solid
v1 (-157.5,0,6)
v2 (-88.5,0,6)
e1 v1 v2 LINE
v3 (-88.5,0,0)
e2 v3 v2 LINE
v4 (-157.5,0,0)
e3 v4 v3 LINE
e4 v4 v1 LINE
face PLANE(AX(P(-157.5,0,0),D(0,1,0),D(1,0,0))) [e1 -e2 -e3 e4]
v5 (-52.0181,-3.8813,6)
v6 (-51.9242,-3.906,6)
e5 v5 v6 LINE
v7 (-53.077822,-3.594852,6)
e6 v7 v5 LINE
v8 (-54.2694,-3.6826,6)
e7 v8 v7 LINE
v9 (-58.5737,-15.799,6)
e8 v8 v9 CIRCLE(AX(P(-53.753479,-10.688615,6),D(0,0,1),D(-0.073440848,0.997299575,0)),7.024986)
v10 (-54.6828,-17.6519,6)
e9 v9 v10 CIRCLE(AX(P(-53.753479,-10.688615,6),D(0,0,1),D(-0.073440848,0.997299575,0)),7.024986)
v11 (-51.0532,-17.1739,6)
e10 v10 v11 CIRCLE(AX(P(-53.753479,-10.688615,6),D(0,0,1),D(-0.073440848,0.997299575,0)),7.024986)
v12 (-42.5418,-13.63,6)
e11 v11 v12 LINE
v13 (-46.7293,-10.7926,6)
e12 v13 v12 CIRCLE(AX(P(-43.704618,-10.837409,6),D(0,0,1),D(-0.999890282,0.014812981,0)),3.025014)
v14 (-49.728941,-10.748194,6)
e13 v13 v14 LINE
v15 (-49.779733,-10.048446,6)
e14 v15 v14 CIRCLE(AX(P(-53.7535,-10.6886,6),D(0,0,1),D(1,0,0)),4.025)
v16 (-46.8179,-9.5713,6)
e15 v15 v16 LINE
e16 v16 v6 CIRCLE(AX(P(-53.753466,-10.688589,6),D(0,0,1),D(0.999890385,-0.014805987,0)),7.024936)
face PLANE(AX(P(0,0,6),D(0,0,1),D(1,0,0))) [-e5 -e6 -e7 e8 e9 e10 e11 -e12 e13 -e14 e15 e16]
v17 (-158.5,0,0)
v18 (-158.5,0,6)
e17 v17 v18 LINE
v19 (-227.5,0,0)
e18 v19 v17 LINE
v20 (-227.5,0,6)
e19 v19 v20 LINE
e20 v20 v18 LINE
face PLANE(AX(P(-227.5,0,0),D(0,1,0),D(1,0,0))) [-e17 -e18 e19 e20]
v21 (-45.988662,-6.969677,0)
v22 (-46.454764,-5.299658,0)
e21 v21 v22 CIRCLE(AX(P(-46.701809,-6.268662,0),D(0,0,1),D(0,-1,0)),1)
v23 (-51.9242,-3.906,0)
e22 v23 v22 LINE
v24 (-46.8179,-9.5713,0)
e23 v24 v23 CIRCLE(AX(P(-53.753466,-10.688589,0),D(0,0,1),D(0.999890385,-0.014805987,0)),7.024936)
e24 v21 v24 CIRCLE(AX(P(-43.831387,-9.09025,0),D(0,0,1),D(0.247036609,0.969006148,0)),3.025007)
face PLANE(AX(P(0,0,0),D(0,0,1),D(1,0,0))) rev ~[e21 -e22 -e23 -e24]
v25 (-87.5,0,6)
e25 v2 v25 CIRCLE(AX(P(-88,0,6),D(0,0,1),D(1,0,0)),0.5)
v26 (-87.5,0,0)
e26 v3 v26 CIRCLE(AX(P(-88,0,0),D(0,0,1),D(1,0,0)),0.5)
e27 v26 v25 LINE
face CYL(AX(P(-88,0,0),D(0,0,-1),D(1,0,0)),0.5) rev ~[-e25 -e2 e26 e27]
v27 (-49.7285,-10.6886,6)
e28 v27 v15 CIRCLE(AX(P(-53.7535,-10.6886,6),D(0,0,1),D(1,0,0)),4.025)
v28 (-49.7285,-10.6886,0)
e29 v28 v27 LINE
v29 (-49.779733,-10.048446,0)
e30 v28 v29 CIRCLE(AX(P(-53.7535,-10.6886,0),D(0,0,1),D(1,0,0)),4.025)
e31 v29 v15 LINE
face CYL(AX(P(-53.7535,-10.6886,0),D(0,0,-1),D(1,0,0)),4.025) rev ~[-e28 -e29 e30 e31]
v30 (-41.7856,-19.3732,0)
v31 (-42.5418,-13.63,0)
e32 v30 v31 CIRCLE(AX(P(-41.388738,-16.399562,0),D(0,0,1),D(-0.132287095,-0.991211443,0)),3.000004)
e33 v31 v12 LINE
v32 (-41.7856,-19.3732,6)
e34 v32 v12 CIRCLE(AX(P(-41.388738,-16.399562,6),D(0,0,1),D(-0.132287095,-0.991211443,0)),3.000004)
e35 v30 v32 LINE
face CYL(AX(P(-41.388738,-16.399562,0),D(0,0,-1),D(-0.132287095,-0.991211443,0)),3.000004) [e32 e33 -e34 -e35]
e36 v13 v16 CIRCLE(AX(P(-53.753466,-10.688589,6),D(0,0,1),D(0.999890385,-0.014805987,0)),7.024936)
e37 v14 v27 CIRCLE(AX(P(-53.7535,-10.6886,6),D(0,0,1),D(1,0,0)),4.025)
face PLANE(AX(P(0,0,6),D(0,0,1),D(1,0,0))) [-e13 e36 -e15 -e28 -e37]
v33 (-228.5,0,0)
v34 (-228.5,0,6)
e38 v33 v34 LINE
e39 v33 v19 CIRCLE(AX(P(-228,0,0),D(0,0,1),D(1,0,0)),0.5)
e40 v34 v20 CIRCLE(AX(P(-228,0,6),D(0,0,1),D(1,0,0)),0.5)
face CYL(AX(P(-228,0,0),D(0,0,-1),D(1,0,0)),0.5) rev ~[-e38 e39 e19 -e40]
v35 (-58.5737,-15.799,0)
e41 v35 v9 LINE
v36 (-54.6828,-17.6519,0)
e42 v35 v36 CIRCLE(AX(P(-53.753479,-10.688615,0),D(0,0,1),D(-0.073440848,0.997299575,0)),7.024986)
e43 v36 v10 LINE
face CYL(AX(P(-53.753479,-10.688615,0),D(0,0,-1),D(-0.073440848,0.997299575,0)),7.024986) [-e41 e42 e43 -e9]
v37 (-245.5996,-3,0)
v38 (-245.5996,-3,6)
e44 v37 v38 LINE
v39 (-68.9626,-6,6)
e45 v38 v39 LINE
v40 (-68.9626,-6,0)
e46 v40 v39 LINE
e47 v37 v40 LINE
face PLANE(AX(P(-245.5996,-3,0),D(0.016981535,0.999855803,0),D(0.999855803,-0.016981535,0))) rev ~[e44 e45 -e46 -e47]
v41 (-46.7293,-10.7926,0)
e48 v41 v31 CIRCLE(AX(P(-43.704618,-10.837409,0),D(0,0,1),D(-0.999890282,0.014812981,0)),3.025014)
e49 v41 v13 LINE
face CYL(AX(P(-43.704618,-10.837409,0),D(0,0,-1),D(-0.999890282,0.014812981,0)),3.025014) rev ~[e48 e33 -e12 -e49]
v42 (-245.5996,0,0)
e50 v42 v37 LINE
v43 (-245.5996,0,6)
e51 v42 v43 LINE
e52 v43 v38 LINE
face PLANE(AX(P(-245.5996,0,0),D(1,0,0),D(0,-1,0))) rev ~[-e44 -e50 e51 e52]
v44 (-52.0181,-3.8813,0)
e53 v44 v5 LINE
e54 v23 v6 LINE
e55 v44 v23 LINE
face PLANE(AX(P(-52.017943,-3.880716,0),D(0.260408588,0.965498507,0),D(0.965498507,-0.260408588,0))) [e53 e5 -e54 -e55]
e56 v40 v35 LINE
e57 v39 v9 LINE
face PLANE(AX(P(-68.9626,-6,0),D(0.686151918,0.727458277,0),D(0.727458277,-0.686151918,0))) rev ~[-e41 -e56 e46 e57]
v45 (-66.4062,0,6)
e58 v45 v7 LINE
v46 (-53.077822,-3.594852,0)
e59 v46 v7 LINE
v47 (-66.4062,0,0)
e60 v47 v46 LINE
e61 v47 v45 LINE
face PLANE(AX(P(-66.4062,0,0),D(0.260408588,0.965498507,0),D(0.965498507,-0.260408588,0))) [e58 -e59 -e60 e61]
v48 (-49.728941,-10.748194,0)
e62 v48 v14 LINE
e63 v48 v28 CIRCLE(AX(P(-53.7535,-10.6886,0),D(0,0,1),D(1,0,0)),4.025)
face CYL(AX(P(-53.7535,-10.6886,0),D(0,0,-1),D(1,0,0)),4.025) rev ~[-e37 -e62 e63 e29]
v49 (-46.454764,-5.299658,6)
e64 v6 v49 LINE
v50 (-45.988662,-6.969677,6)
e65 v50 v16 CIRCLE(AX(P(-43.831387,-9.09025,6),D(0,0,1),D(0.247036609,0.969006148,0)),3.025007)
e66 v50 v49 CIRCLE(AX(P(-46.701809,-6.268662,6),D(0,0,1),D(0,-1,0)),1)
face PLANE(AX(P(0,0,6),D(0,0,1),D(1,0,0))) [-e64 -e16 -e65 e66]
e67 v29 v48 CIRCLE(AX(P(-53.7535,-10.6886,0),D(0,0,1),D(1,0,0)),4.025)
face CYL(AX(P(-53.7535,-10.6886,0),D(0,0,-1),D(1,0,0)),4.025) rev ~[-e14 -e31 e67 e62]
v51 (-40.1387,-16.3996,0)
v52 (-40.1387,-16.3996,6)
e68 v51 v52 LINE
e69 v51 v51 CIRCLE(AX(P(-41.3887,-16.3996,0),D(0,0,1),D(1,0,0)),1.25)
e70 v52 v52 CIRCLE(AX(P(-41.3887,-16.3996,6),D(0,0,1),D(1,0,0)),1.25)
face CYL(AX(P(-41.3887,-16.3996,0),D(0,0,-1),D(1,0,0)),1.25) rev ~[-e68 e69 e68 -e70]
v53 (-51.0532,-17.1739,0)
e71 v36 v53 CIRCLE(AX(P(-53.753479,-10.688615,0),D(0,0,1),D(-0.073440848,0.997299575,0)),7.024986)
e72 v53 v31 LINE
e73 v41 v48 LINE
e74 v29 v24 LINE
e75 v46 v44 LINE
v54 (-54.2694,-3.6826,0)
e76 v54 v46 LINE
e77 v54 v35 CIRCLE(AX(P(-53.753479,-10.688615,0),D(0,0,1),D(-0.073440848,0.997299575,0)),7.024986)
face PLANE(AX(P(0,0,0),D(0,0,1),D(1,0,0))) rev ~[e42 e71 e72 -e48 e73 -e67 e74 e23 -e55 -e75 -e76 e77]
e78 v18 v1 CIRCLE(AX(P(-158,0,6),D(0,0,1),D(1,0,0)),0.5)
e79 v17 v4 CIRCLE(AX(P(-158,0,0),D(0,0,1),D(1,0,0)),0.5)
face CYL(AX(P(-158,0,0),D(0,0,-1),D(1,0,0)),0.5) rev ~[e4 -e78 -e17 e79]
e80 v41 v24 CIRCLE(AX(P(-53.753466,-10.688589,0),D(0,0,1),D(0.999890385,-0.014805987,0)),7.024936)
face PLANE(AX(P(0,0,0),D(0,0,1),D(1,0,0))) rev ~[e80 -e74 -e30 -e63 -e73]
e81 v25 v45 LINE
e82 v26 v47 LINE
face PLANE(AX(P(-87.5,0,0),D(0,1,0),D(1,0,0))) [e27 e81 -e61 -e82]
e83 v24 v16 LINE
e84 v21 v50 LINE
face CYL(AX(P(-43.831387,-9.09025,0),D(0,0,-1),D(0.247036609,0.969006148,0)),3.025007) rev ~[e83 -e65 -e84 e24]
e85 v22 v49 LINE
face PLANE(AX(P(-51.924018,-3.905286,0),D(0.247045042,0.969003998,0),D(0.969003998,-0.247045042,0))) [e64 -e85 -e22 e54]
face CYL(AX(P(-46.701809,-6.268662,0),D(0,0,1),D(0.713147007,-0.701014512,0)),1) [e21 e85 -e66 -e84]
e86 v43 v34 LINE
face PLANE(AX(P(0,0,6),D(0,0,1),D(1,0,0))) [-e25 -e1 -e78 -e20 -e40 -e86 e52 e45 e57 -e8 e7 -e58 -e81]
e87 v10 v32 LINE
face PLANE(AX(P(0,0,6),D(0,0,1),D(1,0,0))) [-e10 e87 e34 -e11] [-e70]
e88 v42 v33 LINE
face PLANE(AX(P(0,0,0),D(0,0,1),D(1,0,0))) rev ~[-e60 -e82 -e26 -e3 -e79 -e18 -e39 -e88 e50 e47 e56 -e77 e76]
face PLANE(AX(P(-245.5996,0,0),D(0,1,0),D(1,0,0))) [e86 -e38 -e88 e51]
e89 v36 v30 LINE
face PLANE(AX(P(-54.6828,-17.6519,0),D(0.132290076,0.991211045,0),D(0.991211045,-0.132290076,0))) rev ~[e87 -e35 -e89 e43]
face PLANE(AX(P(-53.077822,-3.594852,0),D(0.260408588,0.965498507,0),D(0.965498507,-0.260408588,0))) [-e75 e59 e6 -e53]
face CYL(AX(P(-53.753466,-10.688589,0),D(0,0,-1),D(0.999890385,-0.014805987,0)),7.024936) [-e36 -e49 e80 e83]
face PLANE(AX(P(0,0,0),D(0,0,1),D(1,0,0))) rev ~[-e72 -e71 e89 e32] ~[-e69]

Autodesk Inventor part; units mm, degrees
ref_plane "YZ Plane" through (0, 0, 0) normal (1, 0, 0) x (0, 1, 0)
ref_plane "XZ Plane" through (0, 0, 0) normal (0, 1, 0) x (-1, 0, 0)
ref_plane "XY Plane" through (0, 0, 0) normal (0, 0, 1) x (1, 0, 0)
sketch "スケッチ1" plane through (0, 0, 0) normal (0, 0, 1) x (1, 0, 0)
  line L0 (0, 0) -> (0, -3)
  line L1 (0, 0) -> (-15, 0)
  line L2 (-15, 0) -> (-15, -3)
  line L3 (-15, -3) -> (-30, -3)
  line L4 (-30, -3) -> (-30, 0)
  line L5 (-30, 0) -> (-45, 0)
  line L6 (-45, 0) -> (-45, -3)
  line L7 (-245.5996, 0) -> (-66.4062, 0)
  line L8 (-66.4062, 0) -> (-51.9242, -3.906)
  line L9 (-245.5996, 0) -> (-245.5996, -3)
  line L10 (-245.5996, -3) -> (-68.9626, -6)
  line L11 (-68.9626, -6) -> (-58.5737, -15.799)
  circle A0 centre (-53.7535, -10.6886) radius 4.025
  circle A1 centre (-53.7535, -10.6886) radius 1.5
  line L12 (0, -3) -> (0, -9)
  arc A2 (-54.2694, -3.6826) -> (-51.0532, -17.1739) centre (-53.7535, -10.6886) ccw
  line L13 (-54.2694, -3.6826) -> (-45, -3)
  line L14 (-51.0532, -17.1739) -> (-31.4218, -9)
  line L15 (-31.4218, -9) -> (0, -9)
  arc A3 (-46.7293, -10.7926) -> (-42.5418, -13.63) centre (-43.7046, -10.8374) ccw
  circle A4 centre (-43.7046, -10.8374) radius 1.5
  line L16 (-54.6828, -17.6519) -> (-41.7856, -19.3732)
  arc A5 (-41.7856, -19.3732) -> (-42.5418, -13.63) centre (-41.3887, -16.3996) ccw
  arc A6 (-58.5737, -15.799) -> (-54.6828, -17.6519) centre (-53.7535, -10.6886) ccw
  arc A7 (-46.7293, -10.7926) -> (-51.9242, -3.906) centre (-53.7535, -10.6886) ccw
  line L17 (-42, -3) -> (-33, -3)
  line L18 (-33, -3) -> (-33, -6)
  line L19 (-33, -6) -> (-42, -6)
  line L20 (-42, -6) -> (-42, -3)
  line L21 (-12, -3) -> (-3, -3)
  line L22 (-3, -3) -> (-3, -6)
  line L23 (-3, -6) -> (-12, -6)
  line L24 (-12, -6) -> (-12, -3)
  circle A8 centre (-40.95, -3) radius 1.05
  circle A9 centre (-34.05, -3) radius 1.05
  circle A10 centre (-34.05, -6) radius 1.05
  circle A11 centre (-40.95, -6) radius 1.05
  circle A12 centre (-10.95, -3) radius 1.05
  circle A13 centre (-4.05, -3) radius 1.05
  circle A14 centre (-4.05, -6) radius 1.05
  circle A15 centre (-10.95, -6) radius 1.05
  circle A16 centre (-28.95, -3) radius 1.05
  circle A17 centre (-16.05, -3) radius 1.05
  circle A18 centre (-41.3887, -16.3996) radius 1.25
  line L25 (-15.5802, -9) -> (-15.5802, -14)
  line L26 (-15.5802, -14) -> (-4.3492, -14)
  line L27 (-4.3492, -14) -> (-4.3492, -12)
  line L28 (-4.3492, -12) -> (-11.5802, -12)
  arc A19 (-11.5802, -9) -> (-11.5802, -12) centre (-11.5802, -10.5) ccw
  line L29 (-43.7046, -10.8374) -> (-53.7535, -10.6886)
  line L30 (-53.7535, -10.6886) -> (-43.8314, -9.0902)
  arc A20 (-43.0841, -6.159) -> (-46.8179, -9.5713) centre (-43.8314, -9.0902) ccw
  line L31 (-52.0181, -3.8813) -> (-43.0841, -6.159)
  circle A21 centre (-88, 0) radius 0.5
  circle A22 centre (-158, 0) radius 0.5
  circle A23 centre (-228, 0) radius 0.5
  point P0 (-5.1, -6)
  point P1 (-9.9, -6)
  point P2 (-12, -6)
  point P3 (-9.9, -3)
  point P4 (-5.1, -3)
  point P5 (-33, -3)
  point P6 (-33, -6)
  point P7 (-35.1, -6)
  point P8 (-39.9, -6)
  point P9 (-42, -6)
  point P10 (-42, -3)
  point P11 (-39.9, -3)
  point P12 (-35.1, -3)
  point P13 (-17.1, -3)
  point P14 (-27.9, -3)
  point P15 (-58.5737, -15.799)
  point P16 (-54.6828, -17.6519)
  point P17 (-51.9709, -3.8934)
  point P18 (-46.8179, -9.5713)
  point P19 (-87.5, 0)
  point P20 (-88.5, 0)
  point P21 (-157.5, 0)
  point P22 (-158.5, 0)
  point P23 (-227.5, 0)
  point P24 (-228.5, 0)
  dimension "d0" = 3
  dimension "d1" = 15
  dimension "d2" = 3
  dimension "d3" = 15
  dimension "d4" = 15
  dimension "d5" = 3
  dimension "d6" = 3
  dimension "d7" = 8.05
  dimension "d8" = 3
  dimension "d9" = 6
  dimension "d10" = 6
  dimension "d11" = 6.05
  dimension "d12" = 3
  dimension "d13" = 9
  dimension "d14" = 3
  dimension "d15" = 9
  dimension "d16" = 3
  dimension "d17" = 3
  dimension "d18" = 3
  dimension "d19" = 3
  dimension "d20" = 3
  dimension "d21" = 3
  dimension "d22" = 2.1
  dimension "d23" = 2.1
  dimension "d24" = 2.1
  dimension "d25" = 2.1
  dimension "d26" = 2.1
  dimension "d27" = 2.1
  dimension "d28" = 2.1
  dimension "d29" = 2.1
  dimension "d30" = 2.1
  dimension "d31" = 2.1
  dimension "d32" = 2.5
  dimension "d33" = 3
  dimension "d34" = 3
  dimension "d35" = 2
  dimension "d36" = 4
  dimension "d39" = 10
  dimension "d42" = 1
  dimension "d43" = 43
  dimension "d44" = 1
  dimension "d45" = 1
  dimension "d46" = 70
  dimension "d47" = 70
extrude "押し出し1" add sketch "スケッチ1" along normal blind 6 contours A5 L16 A2 L14 | L14 A2 L13 L8 A7 L30 A0 L29 A3 | L29 A0 L30 A7 | A7 L31 A20 | L11 L10 L9 L7 A23 A22 A21 L8 L13 A2
fillet "フィレット1" radius 1 1 edges at (-43.0841, -6.159, 3)
properties part number "シールド先端棒"
